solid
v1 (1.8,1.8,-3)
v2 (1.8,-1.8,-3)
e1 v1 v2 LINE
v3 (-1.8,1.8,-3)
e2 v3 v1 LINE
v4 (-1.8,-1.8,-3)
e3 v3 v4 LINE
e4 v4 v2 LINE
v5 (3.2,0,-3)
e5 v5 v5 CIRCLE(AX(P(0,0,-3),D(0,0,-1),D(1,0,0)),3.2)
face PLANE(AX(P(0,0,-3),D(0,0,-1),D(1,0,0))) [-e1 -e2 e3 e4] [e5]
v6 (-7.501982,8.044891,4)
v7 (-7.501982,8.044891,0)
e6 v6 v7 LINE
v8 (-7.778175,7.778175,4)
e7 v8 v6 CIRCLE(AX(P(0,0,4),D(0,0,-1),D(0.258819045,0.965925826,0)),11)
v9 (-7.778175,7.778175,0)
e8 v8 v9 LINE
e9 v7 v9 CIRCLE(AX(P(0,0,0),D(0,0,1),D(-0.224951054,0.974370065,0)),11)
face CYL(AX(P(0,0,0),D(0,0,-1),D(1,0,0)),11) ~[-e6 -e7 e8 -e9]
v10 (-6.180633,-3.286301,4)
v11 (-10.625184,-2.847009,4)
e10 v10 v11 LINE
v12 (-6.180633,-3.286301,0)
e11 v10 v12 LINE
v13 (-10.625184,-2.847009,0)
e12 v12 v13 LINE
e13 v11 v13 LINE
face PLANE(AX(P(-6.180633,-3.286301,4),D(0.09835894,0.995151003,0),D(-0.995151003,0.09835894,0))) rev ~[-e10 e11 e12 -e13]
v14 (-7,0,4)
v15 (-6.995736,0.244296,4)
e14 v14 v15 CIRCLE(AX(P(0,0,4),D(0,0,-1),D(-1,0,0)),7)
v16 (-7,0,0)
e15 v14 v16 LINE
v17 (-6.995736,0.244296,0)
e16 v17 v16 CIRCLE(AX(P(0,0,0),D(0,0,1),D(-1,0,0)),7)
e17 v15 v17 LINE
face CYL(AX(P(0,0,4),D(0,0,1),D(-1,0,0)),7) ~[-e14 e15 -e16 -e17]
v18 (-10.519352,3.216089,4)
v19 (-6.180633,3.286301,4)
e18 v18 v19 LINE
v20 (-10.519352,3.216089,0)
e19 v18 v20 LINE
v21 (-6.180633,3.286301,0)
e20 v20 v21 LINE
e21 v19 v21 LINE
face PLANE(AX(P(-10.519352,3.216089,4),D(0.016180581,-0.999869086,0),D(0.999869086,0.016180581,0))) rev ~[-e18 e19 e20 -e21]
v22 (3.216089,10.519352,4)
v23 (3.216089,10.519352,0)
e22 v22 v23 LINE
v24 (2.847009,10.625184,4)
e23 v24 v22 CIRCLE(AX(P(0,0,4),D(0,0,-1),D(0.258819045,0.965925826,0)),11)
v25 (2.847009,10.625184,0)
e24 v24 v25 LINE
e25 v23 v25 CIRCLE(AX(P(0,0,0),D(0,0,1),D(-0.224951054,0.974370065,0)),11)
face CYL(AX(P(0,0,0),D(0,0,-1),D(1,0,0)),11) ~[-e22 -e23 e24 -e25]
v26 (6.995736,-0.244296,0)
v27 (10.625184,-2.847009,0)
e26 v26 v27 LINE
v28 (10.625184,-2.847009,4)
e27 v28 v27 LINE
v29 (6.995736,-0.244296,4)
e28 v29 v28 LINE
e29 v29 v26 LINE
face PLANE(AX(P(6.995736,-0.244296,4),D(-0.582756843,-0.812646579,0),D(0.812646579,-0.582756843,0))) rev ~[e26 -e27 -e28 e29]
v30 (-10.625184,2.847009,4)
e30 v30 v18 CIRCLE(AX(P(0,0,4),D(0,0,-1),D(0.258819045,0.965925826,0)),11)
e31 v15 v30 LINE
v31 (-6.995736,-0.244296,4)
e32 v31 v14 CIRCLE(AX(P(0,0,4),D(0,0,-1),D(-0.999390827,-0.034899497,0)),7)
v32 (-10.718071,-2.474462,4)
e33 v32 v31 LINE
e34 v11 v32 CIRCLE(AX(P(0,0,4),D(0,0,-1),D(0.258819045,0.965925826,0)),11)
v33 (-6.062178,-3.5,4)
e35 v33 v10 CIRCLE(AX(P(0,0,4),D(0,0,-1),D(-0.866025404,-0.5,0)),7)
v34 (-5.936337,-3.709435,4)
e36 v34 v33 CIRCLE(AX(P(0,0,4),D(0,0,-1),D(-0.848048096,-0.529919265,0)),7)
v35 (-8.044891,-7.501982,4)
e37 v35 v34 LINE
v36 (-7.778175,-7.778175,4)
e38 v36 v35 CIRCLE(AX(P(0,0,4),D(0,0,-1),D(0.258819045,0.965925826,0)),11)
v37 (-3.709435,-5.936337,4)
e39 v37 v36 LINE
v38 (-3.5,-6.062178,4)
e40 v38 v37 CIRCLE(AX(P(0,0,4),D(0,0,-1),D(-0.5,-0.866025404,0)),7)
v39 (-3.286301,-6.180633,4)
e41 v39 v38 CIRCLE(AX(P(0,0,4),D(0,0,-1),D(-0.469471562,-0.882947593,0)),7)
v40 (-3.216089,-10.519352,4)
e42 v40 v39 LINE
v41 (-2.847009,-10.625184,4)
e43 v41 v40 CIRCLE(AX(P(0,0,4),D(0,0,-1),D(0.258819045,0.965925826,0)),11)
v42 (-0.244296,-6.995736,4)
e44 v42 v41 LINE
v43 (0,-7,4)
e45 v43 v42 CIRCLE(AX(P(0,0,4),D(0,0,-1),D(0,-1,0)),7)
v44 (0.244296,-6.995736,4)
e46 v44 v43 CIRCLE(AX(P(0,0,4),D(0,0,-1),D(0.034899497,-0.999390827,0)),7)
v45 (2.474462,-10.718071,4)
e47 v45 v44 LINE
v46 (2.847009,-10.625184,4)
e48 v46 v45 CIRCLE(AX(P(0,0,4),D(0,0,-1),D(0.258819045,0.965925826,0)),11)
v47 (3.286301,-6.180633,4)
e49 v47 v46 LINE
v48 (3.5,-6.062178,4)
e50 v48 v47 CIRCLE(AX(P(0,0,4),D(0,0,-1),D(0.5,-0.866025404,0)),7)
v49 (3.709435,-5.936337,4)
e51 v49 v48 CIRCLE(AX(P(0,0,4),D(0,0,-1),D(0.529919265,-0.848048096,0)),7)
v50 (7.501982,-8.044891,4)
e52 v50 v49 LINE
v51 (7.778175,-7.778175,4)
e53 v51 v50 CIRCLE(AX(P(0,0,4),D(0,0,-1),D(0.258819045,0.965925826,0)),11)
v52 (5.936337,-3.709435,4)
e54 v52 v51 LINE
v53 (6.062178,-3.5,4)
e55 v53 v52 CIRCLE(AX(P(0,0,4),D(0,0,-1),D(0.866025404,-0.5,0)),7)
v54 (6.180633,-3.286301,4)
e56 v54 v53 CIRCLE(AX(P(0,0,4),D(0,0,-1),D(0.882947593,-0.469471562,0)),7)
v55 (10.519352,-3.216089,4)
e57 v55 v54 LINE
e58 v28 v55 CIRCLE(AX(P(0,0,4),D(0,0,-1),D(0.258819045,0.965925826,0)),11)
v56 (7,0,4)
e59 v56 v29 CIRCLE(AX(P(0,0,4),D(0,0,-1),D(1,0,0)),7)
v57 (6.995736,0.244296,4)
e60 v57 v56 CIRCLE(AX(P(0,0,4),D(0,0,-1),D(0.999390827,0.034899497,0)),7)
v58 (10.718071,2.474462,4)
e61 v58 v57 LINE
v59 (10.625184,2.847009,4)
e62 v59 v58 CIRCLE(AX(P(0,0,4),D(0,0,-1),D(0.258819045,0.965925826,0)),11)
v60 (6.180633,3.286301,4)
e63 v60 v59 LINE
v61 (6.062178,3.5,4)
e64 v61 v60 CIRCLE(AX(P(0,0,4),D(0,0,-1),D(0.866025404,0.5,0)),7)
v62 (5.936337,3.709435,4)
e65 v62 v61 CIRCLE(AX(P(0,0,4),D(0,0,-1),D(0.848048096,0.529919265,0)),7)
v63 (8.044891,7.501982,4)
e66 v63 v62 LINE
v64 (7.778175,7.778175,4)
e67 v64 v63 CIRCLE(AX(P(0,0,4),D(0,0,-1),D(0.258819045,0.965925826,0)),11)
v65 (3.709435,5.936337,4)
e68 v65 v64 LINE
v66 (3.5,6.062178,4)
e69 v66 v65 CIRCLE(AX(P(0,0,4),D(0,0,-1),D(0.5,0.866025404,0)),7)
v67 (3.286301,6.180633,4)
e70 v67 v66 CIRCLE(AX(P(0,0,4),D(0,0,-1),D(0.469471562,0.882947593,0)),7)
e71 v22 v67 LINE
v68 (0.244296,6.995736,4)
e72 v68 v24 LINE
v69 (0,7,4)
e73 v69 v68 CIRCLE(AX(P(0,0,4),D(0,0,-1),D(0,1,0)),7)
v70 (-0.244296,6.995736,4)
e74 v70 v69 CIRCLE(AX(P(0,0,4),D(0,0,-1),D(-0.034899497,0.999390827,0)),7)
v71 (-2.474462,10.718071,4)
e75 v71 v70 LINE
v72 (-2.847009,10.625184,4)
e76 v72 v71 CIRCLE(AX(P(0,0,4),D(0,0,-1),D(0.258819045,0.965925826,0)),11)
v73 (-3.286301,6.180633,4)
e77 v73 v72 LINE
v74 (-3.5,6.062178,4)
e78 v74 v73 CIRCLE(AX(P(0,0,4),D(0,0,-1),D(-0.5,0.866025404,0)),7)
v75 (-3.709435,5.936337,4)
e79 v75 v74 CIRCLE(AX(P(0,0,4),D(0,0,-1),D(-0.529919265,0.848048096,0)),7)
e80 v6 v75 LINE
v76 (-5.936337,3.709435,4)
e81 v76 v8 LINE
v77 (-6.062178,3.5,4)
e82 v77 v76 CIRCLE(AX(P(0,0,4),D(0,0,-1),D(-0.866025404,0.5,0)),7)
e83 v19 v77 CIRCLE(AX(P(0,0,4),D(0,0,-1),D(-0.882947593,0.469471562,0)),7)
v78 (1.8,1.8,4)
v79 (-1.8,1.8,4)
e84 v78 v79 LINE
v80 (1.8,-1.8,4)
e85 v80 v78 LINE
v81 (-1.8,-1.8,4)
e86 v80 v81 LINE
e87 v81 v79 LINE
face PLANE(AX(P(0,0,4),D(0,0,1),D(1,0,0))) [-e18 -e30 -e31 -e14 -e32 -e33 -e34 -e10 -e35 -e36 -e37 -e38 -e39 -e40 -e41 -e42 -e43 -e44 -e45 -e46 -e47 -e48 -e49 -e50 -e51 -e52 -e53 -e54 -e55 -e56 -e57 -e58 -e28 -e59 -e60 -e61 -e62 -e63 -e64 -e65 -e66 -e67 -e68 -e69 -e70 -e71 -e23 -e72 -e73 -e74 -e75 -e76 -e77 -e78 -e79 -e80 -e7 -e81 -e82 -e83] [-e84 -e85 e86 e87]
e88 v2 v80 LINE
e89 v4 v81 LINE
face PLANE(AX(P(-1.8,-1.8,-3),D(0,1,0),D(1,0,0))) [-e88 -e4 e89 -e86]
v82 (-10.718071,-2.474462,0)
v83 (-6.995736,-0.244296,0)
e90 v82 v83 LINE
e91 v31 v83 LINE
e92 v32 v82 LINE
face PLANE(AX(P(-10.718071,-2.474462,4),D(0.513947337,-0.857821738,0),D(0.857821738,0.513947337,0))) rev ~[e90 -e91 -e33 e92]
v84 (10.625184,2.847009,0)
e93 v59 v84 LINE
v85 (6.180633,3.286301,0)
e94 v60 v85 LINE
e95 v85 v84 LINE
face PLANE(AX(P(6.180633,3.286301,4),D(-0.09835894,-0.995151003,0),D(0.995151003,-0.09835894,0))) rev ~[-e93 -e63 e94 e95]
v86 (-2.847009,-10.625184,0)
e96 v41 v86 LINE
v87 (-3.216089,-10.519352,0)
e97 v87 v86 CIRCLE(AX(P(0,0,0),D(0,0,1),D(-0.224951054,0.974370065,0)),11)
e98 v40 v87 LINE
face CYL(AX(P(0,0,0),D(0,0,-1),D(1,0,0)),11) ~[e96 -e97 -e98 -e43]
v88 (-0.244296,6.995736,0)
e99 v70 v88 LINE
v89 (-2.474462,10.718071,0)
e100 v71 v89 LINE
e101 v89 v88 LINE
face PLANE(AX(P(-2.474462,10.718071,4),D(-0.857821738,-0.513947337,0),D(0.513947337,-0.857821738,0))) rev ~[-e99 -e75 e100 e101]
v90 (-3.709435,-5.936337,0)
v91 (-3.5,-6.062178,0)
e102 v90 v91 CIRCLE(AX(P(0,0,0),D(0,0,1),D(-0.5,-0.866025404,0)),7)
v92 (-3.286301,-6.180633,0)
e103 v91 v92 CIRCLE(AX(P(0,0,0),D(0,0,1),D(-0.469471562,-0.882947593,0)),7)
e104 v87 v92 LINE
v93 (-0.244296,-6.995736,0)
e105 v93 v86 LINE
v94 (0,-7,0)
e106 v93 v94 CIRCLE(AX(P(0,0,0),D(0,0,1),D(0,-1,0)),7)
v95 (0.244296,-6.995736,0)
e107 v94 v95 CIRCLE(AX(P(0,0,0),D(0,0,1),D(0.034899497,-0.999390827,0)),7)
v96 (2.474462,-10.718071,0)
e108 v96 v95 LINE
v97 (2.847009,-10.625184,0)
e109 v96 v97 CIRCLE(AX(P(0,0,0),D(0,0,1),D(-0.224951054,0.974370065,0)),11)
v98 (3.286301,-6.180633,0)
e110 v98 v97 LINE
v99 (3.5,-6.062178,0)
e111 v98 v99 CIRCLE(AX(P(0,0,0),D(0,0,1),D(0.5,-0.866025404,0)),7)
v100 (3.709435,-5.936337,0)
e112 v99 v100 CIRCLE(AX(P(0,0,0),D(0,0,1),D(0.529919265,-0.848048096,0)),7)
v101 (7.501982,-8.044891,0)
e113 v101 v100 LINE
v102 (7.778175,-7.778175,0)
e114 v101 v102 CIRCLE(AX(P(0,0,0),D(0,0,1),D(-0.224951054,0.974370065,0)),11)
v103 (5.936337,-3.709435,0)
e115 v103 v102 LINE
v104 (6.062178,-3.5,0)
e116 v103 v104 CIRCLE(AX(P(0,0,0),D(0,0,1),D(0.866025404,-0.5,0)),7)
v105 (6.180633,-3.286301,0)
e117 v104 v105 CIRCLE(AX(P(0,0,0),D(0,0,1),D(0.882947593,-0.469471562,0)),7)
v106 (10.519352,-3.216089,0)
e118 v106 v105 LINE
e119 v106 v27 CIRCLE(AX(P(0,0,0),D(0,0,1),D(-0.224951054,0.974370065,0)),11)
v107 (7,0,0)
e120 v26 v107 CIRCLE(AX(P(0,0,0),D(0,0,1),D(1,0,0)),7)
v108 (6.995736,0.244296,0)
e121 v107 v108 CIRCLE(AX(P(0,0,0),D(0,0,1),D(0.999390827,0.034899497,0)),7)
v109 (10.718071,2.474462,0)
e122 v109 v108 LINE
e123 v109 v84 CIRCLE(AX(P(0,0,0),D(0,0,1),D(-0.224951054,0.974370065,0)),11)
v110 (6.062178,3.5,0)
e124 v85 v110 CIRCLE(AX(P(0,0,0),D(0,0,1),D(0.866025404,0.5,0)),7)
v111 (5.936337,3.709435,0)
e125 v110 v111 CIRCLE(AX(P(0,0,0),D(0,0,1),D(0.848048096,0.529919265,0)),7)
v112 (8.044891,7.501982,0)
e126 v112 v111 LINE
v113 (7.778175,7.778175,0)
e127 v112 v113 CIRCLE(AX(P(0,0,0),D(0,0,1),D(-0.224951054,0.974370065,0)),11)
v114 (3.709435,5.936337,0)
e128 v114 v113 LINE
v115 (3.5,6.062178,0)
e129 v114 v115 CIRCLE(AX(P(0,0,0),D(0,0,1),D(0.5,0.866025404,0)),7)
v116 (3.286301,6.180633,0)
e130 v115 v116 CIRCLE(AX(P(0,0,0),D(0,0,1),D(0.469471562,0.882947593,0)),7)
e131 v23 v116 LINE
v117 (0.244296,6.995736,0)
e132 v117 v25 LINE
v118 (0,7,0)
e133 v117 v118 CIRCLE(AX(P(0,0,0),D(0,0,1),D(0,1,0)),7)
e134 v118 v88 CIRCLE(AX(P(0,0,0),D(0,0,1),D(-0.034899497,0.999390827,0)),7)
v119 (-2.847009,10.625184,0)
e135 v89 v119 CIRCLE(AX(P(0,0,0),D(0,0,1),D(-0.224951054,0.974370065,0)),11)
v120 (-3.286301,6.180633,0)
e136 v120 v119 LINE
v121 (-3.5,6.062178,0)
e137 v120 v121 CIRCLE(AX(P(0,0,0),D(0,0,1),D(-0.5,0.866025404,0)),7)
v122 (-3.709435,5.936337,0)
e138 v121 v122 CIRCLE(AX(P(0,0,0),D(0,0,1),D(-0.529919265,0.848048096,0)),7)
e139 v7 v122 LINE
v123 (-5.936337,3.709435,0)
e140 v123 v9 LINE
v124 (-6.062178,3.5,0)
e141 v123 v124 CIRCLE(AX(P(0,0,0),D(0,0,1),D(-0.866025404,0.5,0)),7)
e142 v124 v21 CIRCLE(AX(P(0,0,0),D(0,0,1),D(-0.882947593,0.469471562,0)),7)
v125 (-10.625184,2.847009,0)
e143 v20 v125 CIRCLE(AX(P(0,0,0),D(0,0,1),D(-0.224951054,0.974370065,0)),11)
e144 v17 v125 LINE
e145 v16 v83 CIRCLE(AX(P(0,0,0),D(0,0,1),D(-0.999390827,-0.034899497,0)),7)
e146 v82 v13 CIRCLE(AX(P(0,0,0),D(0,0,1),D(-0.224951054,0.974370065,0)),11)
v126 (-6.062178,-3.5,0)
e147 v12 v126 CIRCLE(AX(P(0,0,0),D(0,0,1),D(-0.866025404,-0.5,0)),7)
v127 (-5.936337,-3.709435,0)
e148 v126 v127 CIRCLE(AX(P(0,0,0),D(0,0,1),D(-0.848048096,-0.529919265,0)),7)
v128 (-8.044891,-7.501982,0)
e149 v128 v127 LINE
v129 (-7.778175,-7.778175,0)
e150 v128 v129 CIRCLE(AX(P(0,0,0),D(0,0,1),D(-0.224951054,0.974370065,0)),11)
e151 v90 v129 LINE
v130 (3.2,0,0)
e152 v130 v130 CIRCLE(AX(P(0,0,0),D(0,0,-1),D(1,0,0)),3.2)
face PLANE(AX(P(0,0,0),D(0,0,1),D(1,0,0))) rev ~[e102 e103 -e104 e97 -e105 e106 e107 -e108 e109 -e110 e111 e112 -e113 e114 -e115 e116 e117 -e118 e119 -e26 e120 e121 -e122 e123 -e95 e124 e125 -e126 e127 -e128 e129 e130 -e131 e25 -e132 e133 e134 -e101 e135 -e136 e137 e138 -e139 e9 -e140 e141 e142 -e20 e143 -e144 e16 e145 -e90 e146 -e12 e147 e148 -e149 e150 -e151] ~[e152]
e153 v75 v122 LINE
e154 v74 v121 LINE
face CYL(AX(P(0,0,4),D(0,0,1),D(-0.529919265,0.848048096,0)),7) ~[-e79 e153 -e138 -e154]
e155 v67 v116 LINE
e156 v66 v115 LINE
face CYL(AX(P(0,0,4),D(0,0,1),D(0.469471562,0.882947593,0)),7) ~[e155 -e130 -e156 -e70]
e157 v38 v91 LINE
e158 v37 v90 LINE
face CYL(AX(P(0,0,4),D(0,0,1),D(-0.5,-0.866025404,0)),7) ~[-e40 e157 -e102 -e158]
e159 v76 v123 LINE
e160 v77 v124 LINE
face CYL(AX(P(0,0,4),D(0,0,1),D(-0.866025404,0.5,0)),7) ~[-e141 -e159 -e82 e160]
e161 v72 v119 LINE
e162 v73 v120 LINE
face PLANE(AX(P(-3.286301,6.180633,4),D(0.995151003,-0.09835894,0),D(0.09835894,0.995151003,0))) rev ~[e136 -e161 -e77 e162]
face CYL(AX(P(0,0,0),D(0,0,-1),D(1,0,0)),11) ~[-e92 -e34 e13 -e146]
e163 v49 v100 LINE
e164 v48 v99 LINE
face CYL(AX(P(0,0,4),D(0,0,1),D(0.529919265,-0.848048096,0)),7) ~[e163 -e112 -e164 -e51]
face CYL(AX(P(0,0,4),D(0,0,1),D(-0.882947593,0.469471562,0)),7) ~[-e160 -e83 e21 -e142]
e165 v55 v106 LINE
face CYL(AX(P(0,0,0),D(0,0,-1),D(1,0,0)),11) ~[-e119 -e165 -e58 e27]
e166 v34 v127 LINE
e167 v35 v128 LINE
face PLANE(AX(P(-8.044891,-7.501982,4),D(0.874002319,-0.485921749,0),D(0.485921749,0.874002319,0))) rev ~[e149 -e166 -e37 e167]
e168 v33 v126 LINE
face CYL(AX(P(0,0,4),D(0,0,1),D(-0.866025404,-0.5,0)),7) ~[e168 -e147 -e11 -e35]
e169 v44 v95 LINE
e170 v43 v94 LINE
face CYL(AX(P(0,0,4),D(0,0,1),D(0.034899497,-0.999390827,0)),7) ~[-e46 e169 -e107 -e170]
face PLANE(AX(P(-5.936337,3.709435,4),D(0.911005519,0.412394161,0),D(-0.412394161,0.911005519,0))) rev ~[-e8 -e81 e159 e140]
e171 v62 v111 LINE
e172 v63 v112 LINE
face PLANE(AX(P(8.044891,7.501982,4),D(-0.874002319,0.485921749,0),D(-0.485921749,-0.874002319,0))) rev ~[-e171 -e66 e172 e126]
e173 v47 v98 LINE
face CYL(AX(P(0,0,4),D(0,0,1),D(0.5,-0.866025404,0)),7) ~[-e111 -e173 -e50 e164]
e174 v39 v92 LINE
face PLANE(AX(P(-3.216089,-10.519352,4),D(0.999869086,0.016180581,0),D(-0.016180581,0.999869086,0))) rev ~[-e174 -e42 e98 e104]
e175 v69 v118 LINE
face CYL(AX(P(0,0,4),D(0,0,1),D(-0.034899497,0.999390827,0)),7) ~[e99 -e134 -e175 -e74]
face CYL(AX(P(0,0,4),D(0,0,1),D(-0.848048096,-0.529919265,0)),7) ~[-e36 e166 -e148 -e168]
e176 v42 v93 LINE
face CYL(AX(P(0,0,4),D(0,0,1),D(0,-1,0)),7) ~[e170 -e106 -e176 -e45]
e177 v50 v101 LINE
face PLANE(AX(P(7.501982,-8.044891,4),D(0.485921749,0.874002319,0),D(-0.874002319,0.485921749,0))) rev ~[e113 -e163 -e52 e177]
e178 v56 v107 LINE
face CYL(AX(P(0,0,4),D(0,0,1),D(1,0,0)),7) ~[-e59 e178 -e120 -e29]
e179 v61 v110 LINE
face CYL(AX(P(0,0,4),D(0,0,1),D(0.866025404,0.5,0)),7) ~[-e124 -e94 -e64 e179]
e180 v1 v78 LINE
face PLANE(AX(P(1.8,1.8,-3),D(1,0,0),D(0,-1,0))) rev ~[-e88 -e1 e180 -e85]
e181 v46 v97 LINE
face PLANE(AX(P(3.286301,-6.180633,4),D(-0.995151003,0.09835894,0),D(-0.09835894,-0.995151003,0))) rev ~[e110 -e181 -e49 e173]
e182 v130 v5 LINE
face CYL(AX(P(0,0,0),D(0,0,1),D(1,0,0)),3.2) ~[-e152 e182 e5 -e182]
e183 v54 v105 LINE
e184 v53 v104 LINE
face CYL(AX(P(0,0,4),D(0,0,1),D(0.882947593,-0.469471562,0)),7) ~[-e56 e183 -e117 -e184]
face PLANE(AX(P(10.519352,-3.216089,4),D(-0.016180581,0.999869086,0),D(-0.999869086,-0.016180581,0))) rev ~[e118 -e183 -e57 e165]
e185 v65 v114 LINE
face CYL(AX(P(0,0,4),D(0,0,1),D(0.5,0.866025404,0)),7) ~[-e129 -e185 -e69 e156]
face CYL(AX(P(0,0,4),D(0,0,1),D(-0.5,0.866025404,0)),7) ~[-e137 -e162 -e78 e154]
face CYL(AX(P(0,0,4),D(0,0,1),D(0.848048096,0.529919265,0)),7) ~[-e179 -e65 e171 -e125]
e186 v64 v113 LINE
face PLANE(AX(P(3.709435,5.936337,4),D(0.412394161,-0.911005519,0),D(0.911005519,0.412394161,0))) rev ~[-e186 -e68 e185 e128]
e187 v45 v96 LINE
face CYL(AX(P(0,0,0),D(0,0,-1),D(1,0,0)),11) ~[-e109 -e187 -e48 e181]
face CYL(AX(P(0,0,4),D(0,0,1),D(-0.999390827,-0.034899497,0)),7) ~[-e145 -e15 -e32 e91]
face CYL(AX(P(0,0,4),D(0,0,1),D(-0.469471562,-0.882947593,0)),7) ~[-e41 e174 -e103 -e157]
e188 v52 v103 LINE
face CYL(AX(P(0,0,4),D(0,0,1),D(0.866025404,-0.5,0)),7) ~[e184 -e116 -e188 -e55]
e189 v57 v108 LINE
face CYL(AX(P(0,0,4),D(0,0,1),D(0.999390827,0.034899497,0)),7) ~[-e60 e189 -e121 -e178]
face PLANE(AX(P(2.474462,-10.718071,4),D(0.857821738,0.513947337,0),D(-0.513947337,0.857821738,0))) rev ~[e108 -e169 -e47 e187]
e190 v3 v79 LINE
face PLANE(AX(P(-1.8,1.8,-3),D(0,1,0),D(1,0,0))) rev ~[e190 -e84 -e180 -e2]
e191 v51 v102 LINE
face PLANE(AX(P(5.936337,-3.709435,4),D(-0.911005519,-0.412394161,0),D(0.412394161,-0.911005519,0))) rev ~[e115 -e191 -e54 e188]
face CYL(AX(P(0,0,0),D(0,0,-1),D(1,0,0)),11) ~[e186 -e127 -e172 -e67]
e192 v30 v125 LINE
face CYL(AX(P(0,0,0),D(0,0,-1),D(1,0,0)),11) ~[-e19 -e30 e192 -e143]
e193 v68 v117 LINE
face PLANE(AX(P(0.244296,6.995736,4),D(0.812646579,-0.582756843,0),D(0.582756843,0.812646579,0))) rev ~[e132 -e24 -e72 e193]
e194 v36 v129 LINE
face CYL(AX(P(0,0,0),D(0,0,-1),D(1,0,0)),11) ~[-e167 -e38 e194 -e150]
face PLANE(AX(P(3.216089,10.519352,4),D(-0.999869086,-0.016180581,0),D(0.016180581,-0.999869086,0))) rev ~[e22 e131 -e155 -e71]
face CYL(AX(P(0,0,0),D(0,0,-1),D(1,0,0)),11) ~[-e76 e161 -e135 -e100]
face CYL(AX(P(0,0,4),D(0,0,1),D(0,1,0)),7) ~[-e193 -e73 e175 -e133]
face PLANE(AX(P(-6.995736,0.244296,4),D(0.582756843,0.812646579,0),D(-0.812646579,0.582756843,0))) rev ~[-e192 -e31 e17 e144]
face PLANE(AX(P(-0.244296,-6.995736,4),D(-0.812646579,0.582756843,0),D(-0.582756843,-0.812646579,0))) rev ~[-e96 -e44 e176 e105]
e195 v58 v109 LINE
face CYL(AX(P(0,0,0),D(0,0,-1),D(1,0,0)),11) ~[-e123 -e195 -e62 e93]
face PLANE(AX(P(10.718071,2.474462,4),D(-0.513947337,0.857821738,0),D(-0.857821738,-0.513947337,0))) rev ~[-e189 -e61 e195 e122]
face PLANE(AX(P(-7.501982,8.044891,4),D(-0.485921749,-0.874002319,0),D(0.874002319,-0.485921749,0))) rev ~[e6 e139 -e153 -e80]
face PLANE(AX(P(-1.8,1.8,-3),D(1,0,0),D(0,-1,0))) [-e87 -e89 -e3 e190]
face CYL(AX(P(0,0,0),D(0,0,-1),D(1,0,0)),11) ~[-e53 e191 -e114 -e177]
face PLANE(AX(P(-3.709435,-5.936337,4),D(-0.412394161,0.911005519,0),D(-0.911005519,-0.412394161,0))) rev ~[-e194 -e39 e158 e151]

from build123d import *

# Parameters (mm, degrees)
F0_R            = 11
F1_DEPTH        = 4
F3_DEPTH        = 4.001
F3_COPIES_COUNT = 12
F5_R            = 3.2
F6_DEPTH        = 3
F7_W            = 3.6
F7_H            = 3.6
F8_DEPTH        = 7.001


# Not quite as in the source:
# - a pattern or mirror of a feature is missing from the dataset's text; its kind, count and spacing are read off the source's solid


with BuildPart() as f1:
    # F0 (on Top) → F1 (new body)
    with BuildSketch(Plane.XY):
        Circle(F0_R)
    extrude(amount=F1_DEPTH)

    # F2 (on face) → F3 (cut, through all)
    with BuildSketch(Plane.XY.offset(4)):
        with BuildLine():
            Line((0, 11), (0, 7))
            ThreePointArc((0, 7), (0.1221668451, 6.9989338661), (0.2442964769, 6.9957357891))
            Line((0.2442964769, 6.9957357891), (2.8470094961, 10.6251840892))
            ThreePointArc((2.8470094961, 10.6251840892), (1.4357881144, 10.9058934751), (0, 11))
        make_face()
        with BuildLine():
            ThreePointArc((-0.2442964769, 6.9957357891), (-0.1221668451, 6.9989338661), (0, 7))
            Line((0, 7), (0, 11))
            ThreePointArc((0, 11), (-1.2452353514, 10.9292904124), (-2.4744615978, 10.7180707126))
            Line((-2.4744615978, 10.7180707126), (-0.2442964769, 6.9957357891))
        make_face()
    f3 = extrude(amount=-F3_DEPTH, mode=Mode.SUBTRACT)

    # F3_copies: F3 ×12 about axis
    f3_copies_axis = Axis((0, 0, 0), (0, 0, 1))
    for i in range(1, F3_COPIES_COUNT):
        add(f3.rotate(f3_copies_axis, i * 360 / F3_COPIES_COUNT), mode=Mode.SUBTRACT)

    # F5 (on face) → F6 (join)
    with BuildSketch(Plane(origin=(0, 0, 0), x_dir=(1, 0, 0), z_dir=(0, 0, -1))):
        Circle(F5_R)
    extrude(amount=F6_DEPTH)

    # F7 (on face) → F8 (cut, through all)
    with BuildSketch(Plane(origin=(0, 0, -3), x_dir=(1, 0, 0), z_dir=(0, 0, -1))):
        Rectangle(F7_W, F7_H)
    extrude(amount=-F8_DEPTH, mode=Mode.SUBTRACT)


solid = f1.part
